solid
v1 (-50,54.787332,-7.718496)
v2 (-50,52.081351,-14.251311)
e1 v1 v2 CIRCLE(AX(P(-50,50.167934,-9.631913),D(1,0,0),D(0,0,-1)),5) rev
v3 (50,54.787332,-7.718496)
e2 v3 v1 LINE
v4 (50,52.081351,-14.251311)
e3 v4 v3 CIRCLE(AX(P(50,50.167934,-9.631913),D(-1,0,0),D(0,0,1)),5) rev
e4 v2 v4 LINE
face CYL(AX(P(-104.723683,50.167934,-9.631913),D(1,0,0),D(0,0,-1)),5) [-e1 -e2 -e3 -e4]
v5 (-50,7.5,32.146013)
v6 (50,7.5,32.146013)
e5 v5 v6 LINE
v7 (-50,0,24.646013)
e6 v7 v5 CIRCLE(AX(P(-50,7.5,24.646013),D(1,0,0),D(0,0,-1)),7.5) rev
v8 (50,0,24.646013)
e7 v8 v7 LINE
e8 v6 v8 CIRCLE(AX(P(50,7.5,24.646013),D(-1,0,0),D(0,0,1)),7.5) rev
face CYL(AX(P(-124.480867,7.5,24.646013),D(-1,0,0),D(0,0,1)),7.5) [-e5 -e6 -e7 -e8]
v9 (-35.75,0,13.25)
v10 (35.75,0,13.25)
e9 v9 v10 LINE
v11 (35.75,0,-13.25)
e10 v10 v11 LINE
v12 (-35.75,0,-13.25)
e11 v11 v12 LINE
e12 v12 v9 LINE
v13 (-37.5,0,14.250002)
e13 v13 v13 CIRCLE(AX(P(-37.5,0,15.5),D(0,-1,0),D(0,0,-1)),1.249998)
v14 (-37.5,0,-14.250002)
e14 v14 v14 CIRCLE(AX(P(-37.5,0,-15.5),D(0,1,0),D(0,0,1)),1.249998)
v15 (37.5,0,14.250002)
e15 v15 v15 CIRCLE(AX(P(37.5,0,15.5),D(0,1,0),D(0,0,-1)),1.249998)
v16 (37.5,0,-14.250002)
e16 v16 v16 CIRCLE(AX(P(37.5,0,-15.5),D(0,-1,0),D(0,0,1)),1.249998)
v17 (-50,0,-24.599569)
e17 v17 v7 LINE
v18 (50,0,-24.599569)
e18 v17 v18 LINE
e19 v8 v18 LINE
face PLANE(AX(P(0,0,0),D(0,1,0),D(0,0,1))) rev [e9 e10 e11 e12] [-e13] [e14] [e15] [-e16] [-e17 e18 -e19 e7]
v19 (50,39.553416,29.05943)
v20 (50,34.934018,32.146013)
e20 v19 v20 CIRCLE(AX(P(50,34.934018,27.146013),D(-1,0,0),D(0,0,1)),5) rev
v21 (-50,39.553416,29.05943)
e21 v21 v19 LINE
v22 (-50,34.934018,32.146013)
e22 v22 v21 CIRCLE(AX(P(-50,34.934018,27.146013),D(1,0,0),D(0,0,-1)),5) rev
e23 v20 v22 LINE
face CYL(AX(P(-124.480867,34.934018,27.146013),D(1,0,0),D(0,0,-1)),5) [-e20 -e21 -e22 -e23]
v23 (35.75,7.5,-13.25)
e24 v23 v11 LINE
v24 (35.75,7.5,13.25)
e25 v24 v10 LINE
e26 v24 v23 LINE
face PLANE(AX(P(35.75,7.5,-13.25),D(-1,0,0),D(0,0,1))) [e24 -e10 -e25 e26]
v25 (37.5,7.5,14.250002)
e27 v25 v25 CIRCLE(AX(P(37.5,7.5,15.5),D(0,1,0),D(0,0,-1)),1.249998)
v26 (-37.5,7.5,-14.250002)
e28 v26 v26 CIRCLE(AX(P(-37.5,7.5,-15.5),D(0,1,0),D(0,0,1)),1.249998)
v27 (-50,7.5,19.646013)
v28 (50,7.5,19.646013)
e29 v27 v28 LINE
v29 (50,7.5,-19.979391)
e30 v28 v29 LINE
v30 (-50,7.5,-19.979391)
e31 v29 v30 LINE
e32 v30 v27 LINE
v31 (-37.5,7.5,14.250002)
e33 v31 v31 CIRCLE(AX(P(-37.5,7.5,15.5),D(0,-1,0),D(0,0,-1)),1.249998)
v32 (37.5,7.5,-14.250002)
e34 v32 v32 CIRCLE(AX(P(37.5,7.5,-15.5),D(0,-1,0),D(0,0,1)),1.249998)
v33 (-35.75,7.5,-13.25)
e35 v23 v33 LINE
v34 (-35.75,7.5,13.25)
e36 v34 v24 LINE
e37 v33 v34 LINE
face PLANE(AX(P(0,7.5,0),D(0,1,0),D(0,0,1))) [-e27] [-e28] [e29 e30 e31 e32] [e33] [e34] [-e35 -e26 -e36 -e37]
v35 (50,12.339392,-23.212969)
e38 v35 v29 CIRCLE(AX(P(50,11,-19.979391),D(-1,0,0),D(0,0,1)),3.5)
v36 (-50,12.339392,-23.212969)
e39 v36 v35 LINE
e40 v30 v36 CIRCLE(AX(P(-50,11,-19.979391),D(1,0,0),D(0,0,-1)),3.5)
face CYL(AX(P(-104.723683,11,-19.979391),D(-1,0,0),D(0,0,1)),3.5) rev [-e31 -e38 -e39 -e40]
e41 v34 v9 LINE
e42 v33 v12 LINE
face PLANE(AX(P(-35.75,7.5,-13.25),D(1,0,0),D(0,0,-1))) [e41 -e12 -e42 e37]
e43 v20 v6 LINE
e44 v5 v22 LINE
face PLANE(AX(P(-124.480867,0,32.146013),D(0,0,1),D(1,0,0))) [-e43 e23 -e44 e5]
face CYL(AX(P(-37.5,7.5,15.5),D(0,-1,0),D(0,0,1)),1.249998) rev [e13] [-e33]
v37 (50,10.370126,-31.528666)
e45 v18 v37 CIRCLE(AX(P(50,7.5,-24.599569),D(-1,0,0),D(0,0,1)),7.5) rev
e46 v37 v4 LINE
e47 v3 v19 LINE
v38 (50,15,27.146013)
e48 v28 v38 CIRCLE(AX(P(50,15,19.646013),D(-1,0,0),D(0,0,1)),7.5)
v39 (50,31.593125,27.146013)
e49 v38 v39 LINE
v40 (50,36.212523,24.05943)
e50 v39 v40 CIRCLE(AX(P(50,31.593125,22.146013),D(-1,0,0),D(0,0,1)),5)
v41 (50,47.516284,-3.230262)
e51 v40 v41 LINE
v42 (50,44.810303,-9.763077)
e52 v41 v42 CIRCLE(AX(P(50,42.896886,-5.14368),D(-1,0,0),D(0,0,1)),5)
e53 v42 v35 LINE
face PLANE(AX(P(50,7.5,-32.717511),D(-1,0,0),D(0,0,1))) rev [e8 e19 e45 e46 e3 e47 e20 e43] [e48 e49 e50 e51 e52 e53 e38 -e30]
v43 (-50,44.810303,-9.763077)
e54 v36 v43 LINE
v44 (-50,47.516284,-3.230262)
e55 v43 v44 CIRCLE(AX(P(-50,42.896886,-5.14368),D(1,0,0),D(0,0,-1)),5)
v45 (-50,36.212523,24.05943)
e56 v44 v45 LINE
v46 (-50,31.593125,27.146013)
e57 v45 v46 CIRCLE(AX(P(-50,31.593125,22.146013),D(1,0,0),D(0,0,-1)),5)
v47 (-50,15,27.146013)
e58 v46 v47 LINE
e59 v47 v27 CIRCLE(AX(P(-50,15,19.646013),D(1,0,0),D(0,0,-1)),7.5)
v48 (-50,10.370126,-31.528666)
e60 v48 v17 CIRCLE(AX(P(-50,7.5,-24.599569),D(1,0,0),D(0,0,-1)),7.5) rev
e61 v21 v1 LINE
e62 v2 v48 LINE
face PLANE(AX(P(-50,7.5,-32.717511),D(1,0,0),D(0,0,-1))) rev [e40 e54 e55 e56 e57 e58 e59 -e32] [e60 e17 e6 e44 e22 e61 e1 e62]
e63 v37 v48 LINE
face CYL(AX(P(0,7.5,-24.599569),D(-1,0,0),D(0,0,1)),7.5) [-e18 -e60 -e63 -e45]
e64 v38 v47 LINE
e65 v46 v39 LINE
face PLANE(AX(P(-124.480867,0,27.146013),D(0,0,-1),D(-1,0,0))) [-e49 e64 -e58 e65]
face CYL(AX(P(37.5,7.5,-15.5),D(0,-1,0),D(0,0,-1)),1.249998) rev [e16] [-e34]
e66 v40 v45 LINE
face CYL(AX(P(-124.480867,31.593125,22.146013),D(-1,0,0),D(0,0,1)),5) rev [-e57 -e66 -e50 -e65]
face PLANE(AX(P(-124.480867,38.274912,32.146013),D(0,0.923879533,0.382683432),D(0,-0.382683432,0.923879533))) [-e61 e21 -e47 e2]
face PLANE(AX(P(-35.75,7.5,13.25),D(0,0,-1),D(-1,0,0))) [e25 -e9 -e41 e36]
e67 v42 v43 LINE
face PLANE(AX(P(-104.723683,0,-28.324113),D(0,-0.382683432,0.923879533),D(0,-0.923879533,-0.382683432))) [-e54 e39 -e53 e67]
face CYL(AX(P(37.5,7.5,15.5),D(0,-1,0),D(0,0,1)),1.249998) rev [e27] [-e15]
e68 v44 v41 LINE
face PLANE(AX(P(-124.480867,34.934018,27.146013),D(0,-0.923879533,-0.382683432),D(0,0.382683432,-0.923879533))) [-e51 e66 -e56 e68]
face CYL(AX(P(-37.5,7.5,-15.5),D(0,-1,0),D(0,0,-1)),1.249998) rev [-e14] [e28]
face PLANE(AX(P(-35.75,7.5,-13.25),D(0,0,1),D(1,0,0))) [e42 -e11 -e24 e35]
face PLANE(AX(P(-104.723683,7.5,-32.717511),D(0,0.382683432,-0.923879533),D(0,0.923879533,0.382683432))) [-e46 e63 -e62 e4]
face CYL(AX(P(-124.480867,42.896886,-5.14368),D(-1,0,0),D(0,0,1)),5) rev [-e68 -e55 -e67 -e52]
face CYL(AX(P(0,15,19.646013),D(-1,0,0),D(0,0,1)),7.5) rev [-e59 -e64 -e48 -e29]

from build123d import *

# Parameters (mm, degrees)
SKETCH1_W               = 100
SKETCH1_H               = 65.435021842
SKETCH1_R               = 1.2499975
SKETCH1_W_2             = 71.5
SKETCH1_H_2             = 26.5
BOSS_EXTRUDE1_DEPTH     = 7.5
MIRROR2_OUTLINE_R       = 1.2499975
MIRROR2_DEPTH           = 7.5
MIRROR3_OUTLINE_R       = 1.2499975
MIRROR3_DEPTH           = 7.5
BOSS_EXTRUDE2_DEPTH     = 100
FILLET2_R               = 7.5
CUT_EXTRUDE2_DEPTH      = 116.441064867
CUT_EXTRUDE2_DEPTH_BACK = 116.441064867
SKETCH5_W               = 7.5
SKETCH5_H               = 10.864122905
BOSS_EXTRUDE3_DEPTH     = 100
FILLET4_R               = 3.5
FILLET5_R               = 7.5
FILLET6_R               = 5


# Read off the part's stored shape, not the designer's step: Mirror2, Mirror3
with BuildPart() as part:
    # Sketch1 → Boss-Extrude1 (new body)
    with BuildSketch(Plane(origin=(0, 0, 0), x_dir=(1, 0, 0), z_dir=(0, 1, 0))):
        Rectangle(SKETCH1_W, SKETCH1_H)
        with Locations(Location((-37.5, 15.499999988, 0), (0, 0, 270))):
            Circle(SKETCH1_R, mode=Mode.SUBTRACT)
        Rectangle(SKETCH1_W_2, SKETCH1_H_2, mode=Mode.SUBTRACT)
    extrude(amount=BOSS_EXTRUDE1_DEPTH)

    # Mirror2 outline → Mirror2 (cut)
    with BuildSketch(Plane(origin=(0, 0, 0), x_dir=(1, 0, 0), z_dir=(0, 1, 0))):
        with Locations((37.5, 15.499999988)):
            Circle(MIRROR2_OUTLINE_R)
    extrude(amount=MIRROR2_DEPTH, mode=Mode.SUBTRACT)

    # Mirror3 outline → Mirror3 (cut)
    with BuildSketch(Plane(origin=(0, 0, 0), x_dir=(1, 0, 0), z_dir=(0, 1, 0))):
        with Locations((-37.5, -15.499999988)):
            Circle(MIRROR3_OUTLINE_R)
        with Locations((37.5, -15.499999988)):
            Circle(MIRROR3_OUTLINE_R)
    extrude(amount=MIRROR3_DEPTH, mode=Mode.SUBTRACT)

    # Sketch4 → Boss-Extrude2 (add)
    with BuildSketch(Plane(origin=(50, 0, 0), x_dir=(0, 0, -1), z_dir=(1, 0, 0))):
        Polygon((28.324112639, 0), (8.64916927, 47.499515121), (16.14916927, 47.499515121), (32.717510921, 7.5), (35.824112639, 0), align=None)
    extrude(amount=-BOSS_EXTRUDE2_DEPTH)

    # Fillet2
    fillet2_edges = [part.edges().sort_by_distance(p)[0] for p in [
        (0, 0, -35.824112639),
    ]]
    fillet(fillet2_edges, radius=FILLET2_R)

    # Sketch5 → Cut-Extrude2 (cut, two sides: drawn at the far end of the back side and taken through both)
    with BuildSketch(Plane(origin=(50, 0, 0), x_dir=(0, 0, -1), z_dir=(1, 0, 0)).offset(-CUT_EXTRUDE2_DEPTH_BACK)):
        with Locations((-30.896013204, 2.067938548)):
            Rectangle(SKETCH5_W, SKETCH5_H)
    extrude(amount=CUT_EXTRUDE2_DEPTH + CUT_EXTRUDE2_DEPTH_BACK, mode=Mode.SUBTRACT)

    # Sketch6 → Boss-Extrude3 (add)
    with BuildSketch(Plane(origin=(50, 0, 0), x_dir=(0, 0, -1), z_dir=(1, 0, 0))):
        Polygon((-27.146013204, 0), (-32.146013204, 0), (-32.146013204, 38.274911515), (12.337893428, 56.700748949), (13.485305965, 53.930650039), (16.14916927, 47.499515121), (12.93914216, 38.274911515), (8.66493866, 47.461444446), (7.84966016, 49.429700857), (-27.146013204, 34.934018325), align=None)
    extrude(amount=-BOSS_EXTRUDE3_DEPTH)

    # Fillet4
    fillet4_edges = [part.edges().sort_by_distance(p)[0] for p in [
        (0, 7.5, -25.217510921),
    ]]
    fillet(fillet4_edges, radius=FILLET4_R)

    # Fillet5
    fillet5_edges = [part.edges().sort_by_distance(p)[0] for p in [
        (0, 7.5, 27.146013204),
        (0, 0, 32.146013204),
    ]]
    fillet(fillet5_edges, radius=FILLET5_R)

    # Fillet6
    fillet6_edges = [part.edges().sort_by_distance(p)[0] for p in [
        (0, 34.934018325, 27.146013204),
        (0, 38.274911515, 32.146013204),
        (0, 56.700748949, -12.337893428),
        (0, 49.429700857, -7.84966016),
    ]]
    fillet(fillet6_edges, radius=FILLET6_R)


solid = part.part
